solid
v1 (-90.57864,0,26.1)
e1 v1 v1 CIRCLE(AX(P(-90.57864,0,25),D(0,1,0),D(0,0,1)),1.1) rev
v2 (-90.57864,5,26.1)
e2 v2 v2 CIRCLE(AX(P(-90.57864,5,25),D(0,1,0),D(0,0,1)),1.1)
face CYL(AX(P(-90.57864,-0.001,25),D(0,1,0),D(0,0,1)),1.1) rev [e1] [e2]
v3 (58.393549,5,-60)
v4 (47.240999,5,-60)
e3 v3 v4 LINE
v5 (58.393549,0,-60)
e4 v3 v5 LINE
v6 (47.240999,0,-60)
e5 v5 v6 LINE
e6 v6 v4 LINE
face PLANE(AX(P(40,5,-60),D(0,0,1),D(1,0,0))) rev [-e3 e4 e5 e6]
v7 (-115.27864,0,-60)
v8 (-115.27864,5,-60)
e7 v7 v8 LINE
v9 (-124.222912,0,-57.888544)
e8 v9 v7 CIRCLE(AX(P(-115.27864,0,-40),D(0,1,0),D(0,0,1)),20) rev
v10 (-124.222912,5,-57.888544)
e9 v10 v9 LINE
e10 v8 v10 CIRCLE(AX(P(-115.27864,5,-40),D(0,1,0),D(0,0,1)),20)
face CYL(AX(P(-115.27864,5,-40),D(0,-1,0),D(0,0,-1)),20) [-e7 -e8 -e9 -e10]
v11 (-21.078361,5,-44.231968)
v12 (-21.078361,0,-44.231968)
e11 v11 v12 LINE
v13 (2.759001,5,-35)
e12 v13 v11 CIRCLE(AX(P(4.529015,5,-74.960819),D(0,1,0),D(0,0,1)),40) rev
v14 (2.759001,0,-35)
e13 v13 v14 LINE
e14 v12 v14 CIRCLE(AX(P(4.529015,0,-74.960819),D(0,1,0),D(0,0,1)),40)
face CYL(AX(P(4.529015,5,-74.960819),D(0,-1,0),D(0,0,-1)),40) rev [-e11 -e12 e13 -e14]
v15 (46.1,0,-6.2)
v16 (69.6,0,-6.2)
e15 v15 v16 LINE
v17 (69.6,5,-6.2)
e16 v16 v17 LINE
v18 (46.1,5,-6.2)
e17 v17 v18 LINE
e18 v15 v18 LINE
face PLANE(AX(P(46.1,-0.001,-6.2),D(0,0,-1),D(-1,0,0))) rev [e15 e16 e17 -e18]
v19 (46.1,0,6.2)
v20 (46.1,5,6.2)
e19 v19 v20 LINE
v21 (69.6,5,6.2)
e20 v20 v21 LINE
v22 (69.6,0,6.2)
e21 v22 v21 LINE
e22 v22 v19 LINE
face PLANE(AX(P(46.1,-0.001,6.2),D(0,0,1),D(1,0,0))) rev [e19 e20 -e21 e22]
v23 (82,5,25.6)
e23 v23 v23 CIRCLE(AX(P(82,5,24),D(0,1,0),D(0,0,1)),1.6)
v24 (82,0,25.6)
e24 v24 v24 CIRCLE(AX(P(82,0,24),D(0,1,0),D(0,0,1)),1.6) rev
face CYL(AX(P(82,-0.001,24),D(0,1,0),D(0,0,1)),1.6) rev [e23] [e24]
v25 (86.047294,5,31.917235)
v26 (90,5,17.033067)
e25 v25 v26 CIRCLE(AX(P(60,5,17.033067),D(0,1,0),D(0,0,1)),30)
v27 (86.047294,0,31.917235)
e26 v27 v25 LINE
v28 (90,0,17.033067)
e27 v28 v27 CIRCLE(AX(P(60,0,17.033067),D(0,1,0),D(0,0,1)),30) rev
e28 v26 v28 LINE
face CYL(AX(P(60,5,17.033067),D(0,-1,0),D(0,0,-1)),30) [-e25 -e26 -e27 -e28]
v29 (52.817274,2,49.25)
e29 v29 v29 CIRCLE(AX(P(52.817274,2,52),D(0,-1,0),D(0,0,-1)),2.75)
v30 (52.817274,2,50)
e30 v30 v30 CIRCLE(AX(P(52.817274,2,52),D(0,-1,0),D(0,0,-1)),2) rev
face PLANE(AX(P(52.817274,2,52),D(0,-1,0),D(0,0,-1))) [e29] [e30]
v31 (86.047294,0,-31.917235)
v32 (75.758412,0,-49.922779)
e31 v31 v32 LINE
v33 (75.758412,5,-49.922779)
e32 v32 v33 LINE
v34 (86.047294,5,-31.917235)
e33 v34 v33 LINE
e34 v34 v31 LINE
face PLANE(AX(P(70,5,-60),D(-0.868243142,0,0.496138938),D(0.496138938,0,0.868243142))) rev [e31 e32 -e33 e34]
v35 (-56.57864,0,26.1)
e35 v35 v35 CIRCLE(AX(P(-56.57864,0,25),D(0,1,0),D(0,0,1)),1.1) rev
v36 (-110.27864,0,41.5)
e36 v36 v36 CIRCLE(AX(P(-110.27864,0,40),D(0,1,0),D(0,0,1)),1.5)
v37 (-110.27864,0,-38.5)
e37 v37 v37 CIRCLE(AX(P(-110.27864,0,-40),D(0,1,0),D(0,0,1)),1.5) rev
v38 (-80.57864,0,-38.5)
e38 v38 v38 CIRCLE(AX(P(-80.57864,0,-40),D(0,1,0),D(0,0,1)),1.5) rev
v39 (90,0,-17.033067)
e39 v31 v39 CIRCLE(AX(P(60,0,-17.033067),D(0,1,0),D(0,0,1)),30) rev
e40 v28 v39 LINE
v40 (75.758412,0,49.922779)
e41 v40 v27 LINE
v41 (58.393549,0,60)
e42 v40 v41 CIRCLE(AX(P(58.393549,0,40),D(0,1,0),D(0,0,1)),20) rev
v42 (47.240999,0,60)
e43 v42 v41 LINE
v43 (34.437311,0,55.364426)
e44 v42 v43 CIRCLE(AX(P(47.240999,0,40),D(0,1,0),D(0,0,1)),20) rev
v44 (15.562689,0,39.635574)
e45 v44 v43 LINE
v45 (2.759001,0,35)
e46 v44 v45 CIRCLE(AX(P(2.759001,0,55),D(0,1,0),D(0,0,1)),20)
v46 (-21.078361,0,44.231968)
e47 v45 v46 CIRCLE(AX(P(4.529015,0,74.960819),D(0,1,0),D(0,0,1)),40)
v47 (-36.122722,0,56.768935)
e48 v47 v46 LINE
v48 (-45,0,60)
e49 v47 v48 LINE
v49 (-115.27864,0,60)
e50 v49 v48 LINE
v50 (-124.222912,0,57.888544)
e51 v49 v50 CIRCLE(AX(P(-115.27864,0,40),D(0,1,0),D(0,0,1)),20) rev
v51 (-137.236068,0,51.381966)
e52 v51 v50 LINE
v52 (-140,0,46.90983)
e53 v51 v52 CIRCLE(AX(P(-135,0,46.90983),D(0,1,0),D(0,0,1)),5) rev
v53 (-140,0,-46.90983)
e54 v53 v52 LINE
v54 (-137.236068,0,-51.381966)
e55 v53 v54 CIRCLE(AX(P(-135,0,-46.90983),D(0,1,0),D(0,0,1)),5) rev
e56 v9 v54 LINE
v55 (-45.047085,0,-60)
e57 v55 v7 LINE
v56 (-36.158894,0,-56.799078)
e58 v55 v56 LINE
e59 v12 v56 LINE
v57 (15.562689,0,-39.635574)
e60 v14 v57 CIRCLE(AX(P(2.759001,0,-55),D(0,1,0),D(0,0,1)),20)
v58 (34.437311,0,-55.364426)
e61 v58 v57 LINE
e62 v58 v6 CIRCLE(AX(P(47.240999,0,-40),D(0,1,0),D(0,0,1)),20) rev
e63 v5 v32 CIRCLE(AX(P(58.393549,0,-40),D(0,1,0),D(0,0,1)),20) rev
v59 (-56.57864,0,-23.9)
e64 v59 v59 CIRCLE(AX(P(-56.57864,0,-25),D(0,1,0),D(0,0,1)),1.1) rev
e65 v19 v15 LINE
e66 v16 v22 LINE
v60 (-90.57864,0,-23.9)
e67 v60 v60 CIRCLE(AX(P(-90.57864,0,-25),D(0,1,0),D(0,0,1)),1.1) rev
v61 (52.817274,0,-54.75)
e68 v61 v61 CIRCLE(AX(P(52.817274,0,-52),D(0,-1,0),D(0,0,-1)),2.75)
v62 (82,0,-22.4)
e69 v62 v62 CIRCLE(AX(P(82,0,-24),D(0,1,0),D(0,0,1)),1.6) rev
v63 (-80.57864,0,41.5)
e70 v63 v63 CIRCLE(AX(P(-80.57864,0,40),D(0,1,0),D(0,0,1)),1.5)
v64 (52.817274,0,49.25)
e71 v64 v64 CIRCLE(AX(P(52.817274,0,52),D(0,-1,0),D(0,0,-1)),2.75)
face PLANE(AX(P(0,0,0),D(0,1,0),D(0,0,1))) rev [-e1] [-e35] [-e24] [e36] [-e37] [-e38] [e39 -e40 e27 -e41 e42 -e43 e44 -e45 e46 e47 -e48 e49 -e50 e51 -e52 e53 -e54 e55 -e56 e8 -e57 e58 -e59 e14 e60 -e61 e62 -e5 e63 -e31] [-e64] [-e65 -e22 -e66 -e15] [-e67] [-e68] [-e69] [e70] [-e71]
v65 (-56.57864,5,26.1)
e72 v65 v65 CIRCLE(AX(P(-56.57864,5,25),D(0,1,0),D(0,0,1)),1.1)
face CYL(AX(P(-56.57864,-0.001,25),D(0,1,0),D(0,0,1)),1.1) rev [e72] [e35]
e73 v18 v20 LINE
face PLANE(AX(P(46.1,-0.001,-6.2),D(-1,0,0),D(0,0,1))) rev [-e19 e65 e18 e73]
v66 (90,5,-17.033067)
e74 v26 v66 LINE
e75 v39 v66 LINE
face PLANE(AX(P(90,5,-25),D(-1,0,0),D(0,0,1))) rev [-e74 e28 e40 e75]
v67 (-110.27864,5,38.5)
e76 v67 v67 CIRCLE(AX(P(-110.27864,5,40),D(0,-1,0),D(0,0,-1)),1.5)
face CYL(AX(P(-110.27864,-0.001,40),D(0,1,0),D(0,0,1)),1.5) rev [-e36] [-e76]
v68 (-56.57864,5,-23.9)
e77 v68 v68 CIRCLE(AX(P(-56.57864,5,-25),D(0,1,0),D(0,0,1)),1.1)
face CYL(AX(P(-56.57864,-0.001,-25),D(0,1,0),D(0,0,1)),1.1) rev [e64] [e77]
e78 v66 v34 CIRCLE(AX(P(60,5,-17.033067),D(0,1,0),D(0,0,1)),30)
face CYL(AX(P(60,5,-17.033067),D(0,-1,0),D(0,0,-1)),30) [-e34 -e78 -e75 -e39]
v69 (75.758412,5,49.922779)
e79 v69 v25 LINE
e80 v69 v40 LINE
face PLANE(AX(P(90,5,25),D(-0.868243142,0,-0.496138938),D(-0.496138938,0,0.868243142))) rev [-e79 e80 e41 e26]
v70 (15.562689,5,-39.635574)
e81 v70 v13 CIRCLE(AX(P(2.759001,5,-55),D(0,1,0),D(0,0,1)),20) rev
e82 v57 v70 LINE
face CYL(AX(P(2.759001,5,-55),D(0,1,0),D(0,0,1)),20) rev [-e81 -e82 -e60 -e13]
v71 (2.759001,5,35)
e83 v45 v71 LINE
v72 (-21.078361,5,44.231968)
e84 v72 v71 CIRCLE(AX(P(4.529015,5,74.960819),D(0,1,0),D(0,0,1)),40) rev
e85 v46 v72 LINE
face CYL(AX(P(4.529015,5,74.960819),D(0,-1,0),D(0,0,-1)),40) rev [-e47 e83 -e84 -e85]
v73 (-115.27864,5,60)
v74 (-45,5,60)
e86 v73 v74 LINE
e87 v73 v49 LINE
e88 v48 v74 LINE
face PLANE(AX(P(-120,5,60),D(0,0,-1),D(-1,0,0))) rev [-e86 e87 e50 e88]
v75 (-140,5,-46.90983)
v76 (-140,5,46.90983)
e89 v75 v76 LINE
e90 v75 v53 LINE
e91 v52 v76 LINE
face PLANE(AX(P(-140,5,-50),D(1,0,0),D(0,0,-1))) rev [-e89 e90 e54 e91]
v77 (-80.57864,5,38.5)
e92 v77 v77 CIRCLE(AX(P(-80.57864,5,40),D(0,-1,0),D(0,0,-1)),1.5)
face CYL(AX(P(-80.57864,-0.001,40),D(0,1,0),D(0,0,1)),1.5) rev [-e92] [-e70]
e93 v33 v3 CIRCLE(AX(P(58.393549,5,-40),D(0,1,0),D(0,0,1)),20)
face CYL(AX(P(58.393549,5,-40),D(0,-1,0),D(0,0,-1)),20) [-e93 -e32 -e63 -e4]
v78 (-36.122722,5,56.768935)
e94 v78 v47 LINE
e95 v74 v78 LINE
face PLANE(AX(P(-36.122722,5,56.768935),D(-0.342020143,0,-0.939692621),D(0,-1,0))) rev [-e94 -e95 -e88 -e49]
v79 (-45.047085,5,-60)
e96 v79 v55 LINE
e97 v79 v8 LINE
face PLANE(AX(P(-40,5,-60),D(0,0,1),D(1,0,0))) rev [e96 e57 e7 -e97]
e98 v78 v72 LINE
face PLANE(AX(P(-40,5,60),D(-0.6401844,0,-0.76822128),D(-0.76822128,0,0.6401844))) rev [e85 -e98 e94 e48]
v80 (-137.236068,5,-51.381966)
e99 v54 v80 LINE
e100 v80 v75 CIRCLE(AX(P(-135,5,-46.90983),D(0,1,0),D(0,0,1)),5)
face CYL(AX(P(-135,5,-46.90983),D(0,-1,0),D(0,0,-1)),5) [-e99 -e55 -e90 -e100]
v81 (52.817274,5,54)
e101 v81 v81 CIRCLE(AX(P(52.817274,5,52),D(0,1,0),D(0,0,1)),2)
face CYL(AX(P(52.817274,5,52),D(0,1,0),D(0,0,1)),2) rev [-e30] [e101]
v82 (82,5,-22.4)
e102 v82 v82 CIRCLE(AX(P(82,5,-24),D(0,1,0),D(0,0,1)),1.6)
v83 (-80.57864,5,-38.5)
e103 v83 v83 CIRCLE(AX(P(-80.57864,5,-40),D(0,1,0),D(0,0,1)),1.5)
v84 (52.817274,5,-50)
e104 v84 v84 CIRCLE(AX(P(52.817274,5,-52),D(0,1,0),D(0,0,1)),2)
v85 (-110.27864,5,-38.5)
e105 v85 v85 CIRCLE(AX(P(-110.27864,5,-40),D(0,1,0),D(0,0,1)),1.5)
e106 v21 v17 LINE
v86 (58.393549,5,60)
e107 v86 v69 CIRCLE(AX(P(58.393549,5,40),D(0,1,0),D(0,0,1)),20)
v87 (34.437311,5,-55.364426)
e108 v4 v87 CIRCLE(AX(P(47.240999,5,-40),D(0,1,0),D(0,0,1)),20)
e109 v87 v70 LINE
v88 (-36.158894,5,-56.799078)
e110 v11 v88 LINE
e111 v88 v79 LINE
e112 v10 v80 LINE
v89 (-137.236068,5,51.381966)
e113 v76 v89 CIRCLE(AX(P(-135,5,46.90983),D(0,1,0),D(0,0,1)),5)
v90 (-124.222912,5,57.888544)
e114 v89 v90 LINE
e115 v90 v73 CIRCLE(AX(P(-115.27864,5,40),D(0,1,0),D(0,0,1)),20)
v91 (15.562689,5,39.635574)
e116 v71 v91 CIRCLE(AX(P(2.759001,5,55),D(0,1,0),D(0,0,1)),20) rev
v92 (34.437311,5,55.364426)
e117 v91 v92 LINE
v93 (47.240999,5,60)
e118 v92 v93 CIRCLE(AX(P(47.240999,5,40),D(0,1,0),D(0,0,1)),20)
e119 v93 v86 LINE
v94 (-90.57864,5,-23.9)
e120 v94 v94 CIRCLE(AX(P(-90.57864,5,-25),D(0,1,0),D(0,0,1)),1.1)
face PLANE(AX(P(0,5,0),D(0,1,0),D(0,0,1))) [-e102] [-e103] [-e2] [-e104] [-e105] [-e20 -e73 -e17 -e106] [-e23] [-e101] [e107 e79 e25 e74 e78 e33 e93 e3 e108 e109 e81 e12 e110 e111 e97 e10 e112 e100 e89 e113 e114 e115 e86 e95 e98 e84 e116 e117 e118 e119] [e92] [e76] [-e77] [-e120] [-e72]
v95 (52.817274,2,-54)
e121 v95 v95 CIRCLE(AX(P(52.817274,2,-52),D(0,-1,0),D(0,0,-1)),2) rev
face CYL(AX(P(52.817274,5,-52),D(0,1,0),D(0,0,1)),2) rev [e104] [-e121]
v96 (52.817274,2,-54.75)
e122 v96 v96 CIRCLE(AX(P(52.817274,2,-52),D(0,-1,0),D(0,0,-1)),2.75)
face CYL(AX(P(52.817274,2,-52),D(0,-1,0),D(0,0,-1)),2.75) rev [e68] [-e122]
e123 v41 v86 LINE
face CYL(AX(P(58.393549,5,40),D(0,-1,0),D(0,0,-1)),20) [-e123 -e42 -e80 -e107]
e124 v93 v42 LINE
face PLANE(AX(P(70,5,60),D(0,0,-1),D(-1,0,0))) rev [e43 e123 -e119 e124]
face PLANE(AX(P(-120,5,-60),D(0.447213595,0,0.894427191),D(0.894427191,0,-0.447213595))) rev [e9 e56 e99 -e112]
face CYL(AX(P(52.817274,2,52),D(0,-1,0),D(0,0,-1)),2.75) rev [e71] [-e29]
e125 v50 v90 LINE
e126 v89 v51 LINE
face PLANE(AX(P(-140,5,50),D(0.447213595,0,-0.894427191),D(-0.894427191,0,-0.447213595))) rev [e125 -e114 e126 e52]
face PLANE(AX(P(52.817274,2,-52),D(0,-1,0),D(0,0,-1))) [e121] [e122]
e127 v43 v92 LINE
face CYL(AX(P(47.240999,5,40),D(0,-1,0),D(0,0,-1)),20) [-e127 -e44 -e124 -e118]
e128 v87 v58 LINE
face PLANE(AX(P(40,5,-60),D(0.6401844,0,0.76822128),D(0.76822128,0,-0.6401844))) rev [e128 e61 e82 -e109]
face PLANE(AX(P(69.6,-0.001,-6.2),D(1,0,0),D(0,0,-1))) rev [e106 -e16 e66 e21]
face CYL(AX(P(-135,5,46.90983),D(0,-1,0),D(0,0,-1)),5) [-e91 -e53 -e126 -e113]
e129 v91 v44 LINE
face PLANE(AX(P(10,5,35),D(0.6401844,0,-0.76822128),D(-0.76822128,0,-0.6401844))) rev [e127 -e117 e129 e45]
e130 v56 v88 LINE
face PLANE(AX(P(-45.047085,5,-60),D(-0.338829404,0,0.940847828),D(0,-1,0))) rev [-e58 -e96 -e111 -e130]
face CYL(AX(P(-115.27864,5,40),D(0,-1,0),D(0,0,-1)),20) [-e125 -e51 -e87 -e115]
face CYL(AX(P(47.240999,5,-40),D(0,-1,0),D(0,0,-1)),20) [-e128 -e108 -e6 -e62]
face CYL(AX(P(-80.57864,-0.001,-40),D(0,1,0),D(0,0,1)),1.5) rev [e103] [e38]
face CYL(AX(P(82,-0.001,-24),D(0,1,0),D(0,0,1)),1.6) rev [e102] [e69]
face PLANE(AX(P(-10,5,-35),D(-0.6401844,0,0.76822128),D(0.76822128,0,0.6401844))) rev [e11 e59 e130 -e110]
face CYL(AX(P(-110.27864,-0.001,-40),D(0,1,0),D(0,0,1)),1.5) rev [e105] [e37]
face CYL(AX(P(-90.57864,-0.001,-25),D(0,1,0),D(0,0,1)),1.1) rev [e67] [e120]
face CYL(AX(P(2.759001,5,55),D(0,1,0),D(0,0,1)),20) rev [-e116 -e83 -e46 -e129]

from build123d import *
from OCP.BRepFilletAPI import BRepFilletAPI_MakeChamfer

# Parameters (mm, degrees)
BOSS_EXTRUDE1_DEPTH   = 5
CHAMFER1_SIZE         = 5
CHAMFER1_SIZE2        = 5.047084744
FILLET4_R             = 20
F_4_0MM_DOWEL_HOLE1_D = 4
SKETCH5_R             = 2.75
CUT_EXTRUDE1_DEPTH    = 2
FILLET5_R             = 30
FILLET6_R             = 20
FILLET7_R             = 40
FILLET8_R             = 20
FILLET9_R             = 5
CUT_EXTRUDE3_REACH    = 154.398
SKETCH7_R             = 1.5
CUT_EXTRUDE4_REACH    = 154.398
SKETCH8_W             = 23.5
SKETCH8_H             = 12.4
CUT_EXTRUDE5_REACH    = 154.398
SKETCH9_R             = 1.1
CUT_EXTRUDE6_REACH    = 154.398
SKETCH11_R            = 1.6


with BuildPart() as part:
    # Sketch1 → Boss-Extrude1 (new body)
    with BuildSketch(Plane(origin=(0, 0, 0), x_dir=(1, 0, 0), z_dir=(0, 1, 0))):
        Polygon((40, 60), (70, 60), (90, 25), (90, -25), (70, -60), (40, -60), (10, -35), (-10, -35), (-40, -60), (-120, -60), (-140, -50), (-140, 50), (-120, 60), (-40, 60), (-10, 35), (10, 35), align=None)
    extrude(amount=BOSS_EXTRUDE1_DEPTH)

    # Chamfer1: one chamfer whose edges measure the first distance from different faces: ONE call of the kernel's chamfer builder (chamfer() names one face for all edges)
    chamfer1_edges_1 = [part.edges().sort_by_distance(p)[0] for p in [
        (-40, 2.5, 60),
    ]]
    chamfer1_side_1 = [part.faces().sort_by_distance(p)[0] for p in [
        (-80, 2.5, 60),
    ]]
    chamfer1_edges_2 = [part.edges().sort_by_distance(p)[0] for p in [
        (-40, 2.5, -60),
    ]]
    chamfer1_side_2 = [part.faces().sort_by_distance(p)[0] for p in [
        (-25, 2.5, -47.5),
    ]]
    chamfer1 = BRepFilletAPI_MakeChamfer(part.part.solid().wrapped)
    for e in chamfer1_edges_1:
        chamfer1.Add(CHAMFER1_SIZE, CHAMFER1_SIZE2, e.wrapped, chamfer1_side_1[0].wrapped)  # the first distance lies on this face
    for e in chamfer1_edges_2:
        chamfer1.Add(CHAMFER1_SIZE, CHAMFER1_SIZE2, e.wrapped, chamfer1_side_2[0].wrapped)  # the first distance lies on this face
    add(Compound.cast(chamfer1.Shape()), mode=Mode.REPLACE)

    # Fillet4
    fillet4_edges = [part.edges().sort_by_distance(p)[0] for p in [
        (40, 2.5, -60),
        (70, 2.5, -60),
        (70, 2.5, 60),
        (40, 2.5, 60),
    ]]
    fillet(fillet4_edges, radius=FILLET4_R)

    # Ø4.0mm Dowel Hole1 (through all)
    with Locations(Plane(origin=(52.817273997, 5, -52), x_dir=(0, 0, 1), z_dir=(0, 1, 0))):
        with Locations((0, 0), (104, 0)):
            Hole(F_4_0MM_DOWEL_HOLE1_D / 2)

    # Sketch5 → Cut-Extrude1 (cut)
    with BuildSketch(Plane.XZ):
        with Locations(Location((52.817273997, 52, 0), (0, 0, 270))):
            Circle(SKETCH5_R)
        with Locations(Location((52.817273997, -52, 0), (0, 0, 270))):
            Circle(SKETCH5_R)
    extrude(amount=-CUT_EXTRUDE1_DEPTH, mode=Mode.SUBTRACT)

    # Fillet5
    fillet5_edges = [part.edges().sort_by_distance(p)[0] for p in [
        (90, 2.5, -25),
        (90, 2.5, 25),
    ]]
    fillet(fillet5_edges, radius=FILLET5_R)

    # Fillet6
    fillet6_edges = [part.edges().sort_by_distance(p)[0] for p in [
        (10, 2.5, 35),
        (10, 2.5, -35),
    ]]
    fillet(fillet6_edges, radius=FILLET6_R)

    # Fillet7
    # the kernel refuses this fillet: 40 mm, written as the material it adds along each edge
    with BuildSketch(Plane(origin=(-10, 0, -35), x_dir=(-0.768221279597376, 0, -0.6401843996644798), z_dir=(0, 1, 0))) as fillet7_piece_1:
        with BuildLine():
            CenterArc((14.420794682, -40), FILLET7_R, 90, 37.26938559)
            Line((-9.801736302, -8.168113585), (0, 0))
            Line((0, 0), (14.420794682, 0))
        make_face()
    extrude(amount=5)
    with BuildSketch(Plane(origin=(-10, 0, 35), x_dir=(1, 0, 0), z_dir=(0, 1, 0))) as fillet7_piece_2:
        with BuildLine():
            CenterArc((14.529014643, -39.96081897), FILLET7_R, 92.536185502, 37.26938559)
            Line((-11.078361343, -9.231967786), (0, 0))
            Line((0, 0), (12.759001296, 0))
        make_face()
    extrude(amount=5)

    # Fillet8
    fillet8_edges = [part.edges().sort_by_distance(p)[0] for p in [
        (-120, 2.5, 60),
        (-120, 2.5, -60),
    ]]
    fillet(fillet8_edges, radius=FILLET8_R)

    # Fillet9
    fillet9_edges = [part.edges().sort_by_distance(p)[0] for p in [
        (-140, 2.5, 50),
        (-140, 2.5, -50),
    ]]
    fillet(fillet9_edges, radius=FILLET9_R)

    # Sketch7 → Cut-Extrude3 (cut, up to next)
    with BuildSketch(Plane(origin=(0, 5, 0), x_dir=(1, 0, 0), z_dir=(0, 1, 0)), mode=Mode.PRIVATE) as cut_extrude3_sk1:
        with Locations(Location((-110.27864045, 40, 0), (0, 0, 270))):
            Circle(SKETCH7_R)
    cut_extrude3_tool1 = extrude(cut_extrude3_sk1.sketch, amount=-CUT_EXTRUDE3_REACH, mode=Mode.PRIVATE) & part.part
    # Sketch7 → Cut-Extrude3 (cut, up to next)
    with BuildSketch(Plane(origin=(0, 5, 0), x_dir=(1, 0, 0), z_dir=(0, 1, 0)), mode=Mode.PRIVATE) as cut_extrude3_sk2:
        with Locations(Location((-80.57864045, 40, 0), (0, 0, 270))):
            Circle(SKETCH7_R)
    cut_extrude3_tool2 = extrude(cut_extrude3_sk2.sketch, amount=-CUT_EXTRUDE3_REACH, mode=Mode.PRIVATE) & part.part
    cut_extrude3_1 = cut_extrude3_tool1.solids().sort_by_distance((-110.27864, 5, -40))[0]
    add(cut_extrude3_1, mode=Mode.SUBTRACT)
    cut_extrude3_2 = cut_extrude3_tool2.solids().sort_by_distance((-80.57864, 5, -40))[0]
    add(cut_extrude3_2, mode=Mode.SUBTRACT)
    cut_extrude3 = cut_extrude3_1 + cut_extrude3_2  # Cut-Extrude3 as one shape, for the pattern or mirror that repeats it

    # Mirror1: Cut-Extrude3 across plane
    add(cut_extrude3.mirror(Plane.XY), mode=Mode.SUBTRACT)

    # Sketch8 → Cut-Extrude4 (cut, up to next)
    with BuildSketch(Plane(origin=(0, 5, 0), x_dir=(1, 0, 0), z_dir=(0, 1, 0)), mode=Mode.PRIVATE) as cut_extrude4_sk1:
        with Locations((57.85, 0)):
            Rectangle(SKETCH8_W, SKETCH8_H)
    cut_extrude4_tool1 = extrude(cut_extrude4_sk1.sketch, amount=-CUT_EXTRUDE4_REACH, mode=Mode.PRIVATE) & part.part
    add(cut_extrude4_tool1.solids().sort_by_distance((57.85, 5, 0))[0], mode=Mode.SUBTRACT)

    # Sketch9 → Cut-Extrude5 (cut, up to next)
    with BuildSketch(Plane(origin=(0, 5, 0), x_dir=(1, 0, 0), z_dir=(0, 1, 0)), mode=Mode.PRIVATE) as cut_extrude5_sk1:
        with Locations(Location((-90.57864045, 25, 0), (0, 0, 270))):
            Circle(SKETCH9_R)
    cut_extrude5_tool1 = extrude(cut_extrude5_sk1.sketch, amount=-CUT_EXTRUDE5_REACH, mode=Mode.PRIVATE) & part.part
    # Sketch9 → Cut-Extrude5 (cut, up to next)
    with BuildSketch(Plane(origin=(0, 5, 0), x_dir=(1, 0, 0), z_dir=(0, 1, 0)), mode=Mode.PRIVATE) as cut_extrude5_sk2:
        with Locations(Location((-56.57864045, 25, 0), (0, 0, 270))):
            Circle(SKETCH9_R)
    cut_extrude5_tool2 = extrude(cut_extrude5_sk2.sketch, amount=-CUT_EXTRUDE5_REACH, mode=Mode.PRIVATE) & part.part
    # Sketch9 → Cut-Extrude5 (cut, up to next)
    with BuildSketch(Plane(origin=(0, 5, 0), x_dir=(1, 0, 0), z_dir=(0, 1, 0)), mode=Mode.PRIVATE) as cut_extrude5_sk3:
        with Locations(Location((-90.57864045, -25, 0), (0, 0, 270))):
            Circle(SKETCH9_R)
    cut_extrude5_tool3 = extrude(cut_extrude5_sk3.sketch, amount=-CUT_EXTRUDE5_REACH, mode=Mode.PRIVATE) & part.part
    # Sketch9 → Cut-Extrude5 (cut, up to next)
    with BuildSketch(Plane(origin=(0, 5, 0), x_dir=(1, 0, 0), z_dir=(0, 1, 0)), mode=Mode.PRIVATE) as cut_extrude5_sk4:
        with Locations(Location((-56.57864045, -25, 0), (0, 0, 270))):
            Circle(SKETCH9_R)
    cut_extrude5_tool4 = extrude(cut_extrude5_sk4.sketch, amount=-CUT_EXTRUDE5_REACH, mode=Mode.PRIVATE) & part.part
    add(cut_extrude5_tool1.solids().sort_by_distance((-90.57864, 5, -25))[0], mode=Mode.SUBTRACT)
    add(cut_extrude5_tool2.solids().sort_by_distance((-56.57864, 5, -25))[0], mode=Mode.SUBTRACT)
    add(cut_extrude5_tool3.solids().sort_by_distance((-90.57864, 5, 25))[0], mode=Mode.SUBTRACT)
    add(cut_extrude5_tool4.solids().sort_by_distance((-56.57864, 5, 25))[0], mode=Mode.SUBTRACT)

    # Sketch11 → Cut-Extrude6 (cut, up to next)
    with BuildSketch(Plane(origin=(0, 5, 0), x_dir=(1, 0, 0), z_dir=(0, 1, 0)), mode=Mode.PRIVATE) as cut_extrude6_sk1:
        with Locations(Location((82, 24, 0), (0, 0, 270))):
            Circle(SKETCH11_R)
    cut_extrude6_tool1 = extrude(cut_extrude6_sk1.sketch, amount=-CUT_EXTRUDE6_REACH, mode=Mode.PRIVATE) & part.part
    # Sketch11 → Cut-Extrude6 (cut, up to next)
    with BuildSketch(Plane(origin=(0, 5, 0), x_dir=(1, 0, 0), z_dir=(0, 1, 0)), mode=Mode.PRIVATE) as cut_extrude6_sk2:
        with Locations(Location((82, -24, 0), (0, 0, 270))):
            Circle(SKETCH11_R)
    cut_extrude6_tool2 = extrude(cut_extrude6_sk2.sketch, amount=-CUT_EXTRUDE6_REACH, mode=Mode.PRIVATE) & part.part
    add(cut_extrude6_tool1.solids().sort_by_distance((82, 5, -24))[0], mode=Mode.SUBTRACT)
    add(cut_extrude6_tool2.solids().sort_by_distance((82, 5, 24))[0], mode=Mode.SUBTRACT)


solid = part.part
